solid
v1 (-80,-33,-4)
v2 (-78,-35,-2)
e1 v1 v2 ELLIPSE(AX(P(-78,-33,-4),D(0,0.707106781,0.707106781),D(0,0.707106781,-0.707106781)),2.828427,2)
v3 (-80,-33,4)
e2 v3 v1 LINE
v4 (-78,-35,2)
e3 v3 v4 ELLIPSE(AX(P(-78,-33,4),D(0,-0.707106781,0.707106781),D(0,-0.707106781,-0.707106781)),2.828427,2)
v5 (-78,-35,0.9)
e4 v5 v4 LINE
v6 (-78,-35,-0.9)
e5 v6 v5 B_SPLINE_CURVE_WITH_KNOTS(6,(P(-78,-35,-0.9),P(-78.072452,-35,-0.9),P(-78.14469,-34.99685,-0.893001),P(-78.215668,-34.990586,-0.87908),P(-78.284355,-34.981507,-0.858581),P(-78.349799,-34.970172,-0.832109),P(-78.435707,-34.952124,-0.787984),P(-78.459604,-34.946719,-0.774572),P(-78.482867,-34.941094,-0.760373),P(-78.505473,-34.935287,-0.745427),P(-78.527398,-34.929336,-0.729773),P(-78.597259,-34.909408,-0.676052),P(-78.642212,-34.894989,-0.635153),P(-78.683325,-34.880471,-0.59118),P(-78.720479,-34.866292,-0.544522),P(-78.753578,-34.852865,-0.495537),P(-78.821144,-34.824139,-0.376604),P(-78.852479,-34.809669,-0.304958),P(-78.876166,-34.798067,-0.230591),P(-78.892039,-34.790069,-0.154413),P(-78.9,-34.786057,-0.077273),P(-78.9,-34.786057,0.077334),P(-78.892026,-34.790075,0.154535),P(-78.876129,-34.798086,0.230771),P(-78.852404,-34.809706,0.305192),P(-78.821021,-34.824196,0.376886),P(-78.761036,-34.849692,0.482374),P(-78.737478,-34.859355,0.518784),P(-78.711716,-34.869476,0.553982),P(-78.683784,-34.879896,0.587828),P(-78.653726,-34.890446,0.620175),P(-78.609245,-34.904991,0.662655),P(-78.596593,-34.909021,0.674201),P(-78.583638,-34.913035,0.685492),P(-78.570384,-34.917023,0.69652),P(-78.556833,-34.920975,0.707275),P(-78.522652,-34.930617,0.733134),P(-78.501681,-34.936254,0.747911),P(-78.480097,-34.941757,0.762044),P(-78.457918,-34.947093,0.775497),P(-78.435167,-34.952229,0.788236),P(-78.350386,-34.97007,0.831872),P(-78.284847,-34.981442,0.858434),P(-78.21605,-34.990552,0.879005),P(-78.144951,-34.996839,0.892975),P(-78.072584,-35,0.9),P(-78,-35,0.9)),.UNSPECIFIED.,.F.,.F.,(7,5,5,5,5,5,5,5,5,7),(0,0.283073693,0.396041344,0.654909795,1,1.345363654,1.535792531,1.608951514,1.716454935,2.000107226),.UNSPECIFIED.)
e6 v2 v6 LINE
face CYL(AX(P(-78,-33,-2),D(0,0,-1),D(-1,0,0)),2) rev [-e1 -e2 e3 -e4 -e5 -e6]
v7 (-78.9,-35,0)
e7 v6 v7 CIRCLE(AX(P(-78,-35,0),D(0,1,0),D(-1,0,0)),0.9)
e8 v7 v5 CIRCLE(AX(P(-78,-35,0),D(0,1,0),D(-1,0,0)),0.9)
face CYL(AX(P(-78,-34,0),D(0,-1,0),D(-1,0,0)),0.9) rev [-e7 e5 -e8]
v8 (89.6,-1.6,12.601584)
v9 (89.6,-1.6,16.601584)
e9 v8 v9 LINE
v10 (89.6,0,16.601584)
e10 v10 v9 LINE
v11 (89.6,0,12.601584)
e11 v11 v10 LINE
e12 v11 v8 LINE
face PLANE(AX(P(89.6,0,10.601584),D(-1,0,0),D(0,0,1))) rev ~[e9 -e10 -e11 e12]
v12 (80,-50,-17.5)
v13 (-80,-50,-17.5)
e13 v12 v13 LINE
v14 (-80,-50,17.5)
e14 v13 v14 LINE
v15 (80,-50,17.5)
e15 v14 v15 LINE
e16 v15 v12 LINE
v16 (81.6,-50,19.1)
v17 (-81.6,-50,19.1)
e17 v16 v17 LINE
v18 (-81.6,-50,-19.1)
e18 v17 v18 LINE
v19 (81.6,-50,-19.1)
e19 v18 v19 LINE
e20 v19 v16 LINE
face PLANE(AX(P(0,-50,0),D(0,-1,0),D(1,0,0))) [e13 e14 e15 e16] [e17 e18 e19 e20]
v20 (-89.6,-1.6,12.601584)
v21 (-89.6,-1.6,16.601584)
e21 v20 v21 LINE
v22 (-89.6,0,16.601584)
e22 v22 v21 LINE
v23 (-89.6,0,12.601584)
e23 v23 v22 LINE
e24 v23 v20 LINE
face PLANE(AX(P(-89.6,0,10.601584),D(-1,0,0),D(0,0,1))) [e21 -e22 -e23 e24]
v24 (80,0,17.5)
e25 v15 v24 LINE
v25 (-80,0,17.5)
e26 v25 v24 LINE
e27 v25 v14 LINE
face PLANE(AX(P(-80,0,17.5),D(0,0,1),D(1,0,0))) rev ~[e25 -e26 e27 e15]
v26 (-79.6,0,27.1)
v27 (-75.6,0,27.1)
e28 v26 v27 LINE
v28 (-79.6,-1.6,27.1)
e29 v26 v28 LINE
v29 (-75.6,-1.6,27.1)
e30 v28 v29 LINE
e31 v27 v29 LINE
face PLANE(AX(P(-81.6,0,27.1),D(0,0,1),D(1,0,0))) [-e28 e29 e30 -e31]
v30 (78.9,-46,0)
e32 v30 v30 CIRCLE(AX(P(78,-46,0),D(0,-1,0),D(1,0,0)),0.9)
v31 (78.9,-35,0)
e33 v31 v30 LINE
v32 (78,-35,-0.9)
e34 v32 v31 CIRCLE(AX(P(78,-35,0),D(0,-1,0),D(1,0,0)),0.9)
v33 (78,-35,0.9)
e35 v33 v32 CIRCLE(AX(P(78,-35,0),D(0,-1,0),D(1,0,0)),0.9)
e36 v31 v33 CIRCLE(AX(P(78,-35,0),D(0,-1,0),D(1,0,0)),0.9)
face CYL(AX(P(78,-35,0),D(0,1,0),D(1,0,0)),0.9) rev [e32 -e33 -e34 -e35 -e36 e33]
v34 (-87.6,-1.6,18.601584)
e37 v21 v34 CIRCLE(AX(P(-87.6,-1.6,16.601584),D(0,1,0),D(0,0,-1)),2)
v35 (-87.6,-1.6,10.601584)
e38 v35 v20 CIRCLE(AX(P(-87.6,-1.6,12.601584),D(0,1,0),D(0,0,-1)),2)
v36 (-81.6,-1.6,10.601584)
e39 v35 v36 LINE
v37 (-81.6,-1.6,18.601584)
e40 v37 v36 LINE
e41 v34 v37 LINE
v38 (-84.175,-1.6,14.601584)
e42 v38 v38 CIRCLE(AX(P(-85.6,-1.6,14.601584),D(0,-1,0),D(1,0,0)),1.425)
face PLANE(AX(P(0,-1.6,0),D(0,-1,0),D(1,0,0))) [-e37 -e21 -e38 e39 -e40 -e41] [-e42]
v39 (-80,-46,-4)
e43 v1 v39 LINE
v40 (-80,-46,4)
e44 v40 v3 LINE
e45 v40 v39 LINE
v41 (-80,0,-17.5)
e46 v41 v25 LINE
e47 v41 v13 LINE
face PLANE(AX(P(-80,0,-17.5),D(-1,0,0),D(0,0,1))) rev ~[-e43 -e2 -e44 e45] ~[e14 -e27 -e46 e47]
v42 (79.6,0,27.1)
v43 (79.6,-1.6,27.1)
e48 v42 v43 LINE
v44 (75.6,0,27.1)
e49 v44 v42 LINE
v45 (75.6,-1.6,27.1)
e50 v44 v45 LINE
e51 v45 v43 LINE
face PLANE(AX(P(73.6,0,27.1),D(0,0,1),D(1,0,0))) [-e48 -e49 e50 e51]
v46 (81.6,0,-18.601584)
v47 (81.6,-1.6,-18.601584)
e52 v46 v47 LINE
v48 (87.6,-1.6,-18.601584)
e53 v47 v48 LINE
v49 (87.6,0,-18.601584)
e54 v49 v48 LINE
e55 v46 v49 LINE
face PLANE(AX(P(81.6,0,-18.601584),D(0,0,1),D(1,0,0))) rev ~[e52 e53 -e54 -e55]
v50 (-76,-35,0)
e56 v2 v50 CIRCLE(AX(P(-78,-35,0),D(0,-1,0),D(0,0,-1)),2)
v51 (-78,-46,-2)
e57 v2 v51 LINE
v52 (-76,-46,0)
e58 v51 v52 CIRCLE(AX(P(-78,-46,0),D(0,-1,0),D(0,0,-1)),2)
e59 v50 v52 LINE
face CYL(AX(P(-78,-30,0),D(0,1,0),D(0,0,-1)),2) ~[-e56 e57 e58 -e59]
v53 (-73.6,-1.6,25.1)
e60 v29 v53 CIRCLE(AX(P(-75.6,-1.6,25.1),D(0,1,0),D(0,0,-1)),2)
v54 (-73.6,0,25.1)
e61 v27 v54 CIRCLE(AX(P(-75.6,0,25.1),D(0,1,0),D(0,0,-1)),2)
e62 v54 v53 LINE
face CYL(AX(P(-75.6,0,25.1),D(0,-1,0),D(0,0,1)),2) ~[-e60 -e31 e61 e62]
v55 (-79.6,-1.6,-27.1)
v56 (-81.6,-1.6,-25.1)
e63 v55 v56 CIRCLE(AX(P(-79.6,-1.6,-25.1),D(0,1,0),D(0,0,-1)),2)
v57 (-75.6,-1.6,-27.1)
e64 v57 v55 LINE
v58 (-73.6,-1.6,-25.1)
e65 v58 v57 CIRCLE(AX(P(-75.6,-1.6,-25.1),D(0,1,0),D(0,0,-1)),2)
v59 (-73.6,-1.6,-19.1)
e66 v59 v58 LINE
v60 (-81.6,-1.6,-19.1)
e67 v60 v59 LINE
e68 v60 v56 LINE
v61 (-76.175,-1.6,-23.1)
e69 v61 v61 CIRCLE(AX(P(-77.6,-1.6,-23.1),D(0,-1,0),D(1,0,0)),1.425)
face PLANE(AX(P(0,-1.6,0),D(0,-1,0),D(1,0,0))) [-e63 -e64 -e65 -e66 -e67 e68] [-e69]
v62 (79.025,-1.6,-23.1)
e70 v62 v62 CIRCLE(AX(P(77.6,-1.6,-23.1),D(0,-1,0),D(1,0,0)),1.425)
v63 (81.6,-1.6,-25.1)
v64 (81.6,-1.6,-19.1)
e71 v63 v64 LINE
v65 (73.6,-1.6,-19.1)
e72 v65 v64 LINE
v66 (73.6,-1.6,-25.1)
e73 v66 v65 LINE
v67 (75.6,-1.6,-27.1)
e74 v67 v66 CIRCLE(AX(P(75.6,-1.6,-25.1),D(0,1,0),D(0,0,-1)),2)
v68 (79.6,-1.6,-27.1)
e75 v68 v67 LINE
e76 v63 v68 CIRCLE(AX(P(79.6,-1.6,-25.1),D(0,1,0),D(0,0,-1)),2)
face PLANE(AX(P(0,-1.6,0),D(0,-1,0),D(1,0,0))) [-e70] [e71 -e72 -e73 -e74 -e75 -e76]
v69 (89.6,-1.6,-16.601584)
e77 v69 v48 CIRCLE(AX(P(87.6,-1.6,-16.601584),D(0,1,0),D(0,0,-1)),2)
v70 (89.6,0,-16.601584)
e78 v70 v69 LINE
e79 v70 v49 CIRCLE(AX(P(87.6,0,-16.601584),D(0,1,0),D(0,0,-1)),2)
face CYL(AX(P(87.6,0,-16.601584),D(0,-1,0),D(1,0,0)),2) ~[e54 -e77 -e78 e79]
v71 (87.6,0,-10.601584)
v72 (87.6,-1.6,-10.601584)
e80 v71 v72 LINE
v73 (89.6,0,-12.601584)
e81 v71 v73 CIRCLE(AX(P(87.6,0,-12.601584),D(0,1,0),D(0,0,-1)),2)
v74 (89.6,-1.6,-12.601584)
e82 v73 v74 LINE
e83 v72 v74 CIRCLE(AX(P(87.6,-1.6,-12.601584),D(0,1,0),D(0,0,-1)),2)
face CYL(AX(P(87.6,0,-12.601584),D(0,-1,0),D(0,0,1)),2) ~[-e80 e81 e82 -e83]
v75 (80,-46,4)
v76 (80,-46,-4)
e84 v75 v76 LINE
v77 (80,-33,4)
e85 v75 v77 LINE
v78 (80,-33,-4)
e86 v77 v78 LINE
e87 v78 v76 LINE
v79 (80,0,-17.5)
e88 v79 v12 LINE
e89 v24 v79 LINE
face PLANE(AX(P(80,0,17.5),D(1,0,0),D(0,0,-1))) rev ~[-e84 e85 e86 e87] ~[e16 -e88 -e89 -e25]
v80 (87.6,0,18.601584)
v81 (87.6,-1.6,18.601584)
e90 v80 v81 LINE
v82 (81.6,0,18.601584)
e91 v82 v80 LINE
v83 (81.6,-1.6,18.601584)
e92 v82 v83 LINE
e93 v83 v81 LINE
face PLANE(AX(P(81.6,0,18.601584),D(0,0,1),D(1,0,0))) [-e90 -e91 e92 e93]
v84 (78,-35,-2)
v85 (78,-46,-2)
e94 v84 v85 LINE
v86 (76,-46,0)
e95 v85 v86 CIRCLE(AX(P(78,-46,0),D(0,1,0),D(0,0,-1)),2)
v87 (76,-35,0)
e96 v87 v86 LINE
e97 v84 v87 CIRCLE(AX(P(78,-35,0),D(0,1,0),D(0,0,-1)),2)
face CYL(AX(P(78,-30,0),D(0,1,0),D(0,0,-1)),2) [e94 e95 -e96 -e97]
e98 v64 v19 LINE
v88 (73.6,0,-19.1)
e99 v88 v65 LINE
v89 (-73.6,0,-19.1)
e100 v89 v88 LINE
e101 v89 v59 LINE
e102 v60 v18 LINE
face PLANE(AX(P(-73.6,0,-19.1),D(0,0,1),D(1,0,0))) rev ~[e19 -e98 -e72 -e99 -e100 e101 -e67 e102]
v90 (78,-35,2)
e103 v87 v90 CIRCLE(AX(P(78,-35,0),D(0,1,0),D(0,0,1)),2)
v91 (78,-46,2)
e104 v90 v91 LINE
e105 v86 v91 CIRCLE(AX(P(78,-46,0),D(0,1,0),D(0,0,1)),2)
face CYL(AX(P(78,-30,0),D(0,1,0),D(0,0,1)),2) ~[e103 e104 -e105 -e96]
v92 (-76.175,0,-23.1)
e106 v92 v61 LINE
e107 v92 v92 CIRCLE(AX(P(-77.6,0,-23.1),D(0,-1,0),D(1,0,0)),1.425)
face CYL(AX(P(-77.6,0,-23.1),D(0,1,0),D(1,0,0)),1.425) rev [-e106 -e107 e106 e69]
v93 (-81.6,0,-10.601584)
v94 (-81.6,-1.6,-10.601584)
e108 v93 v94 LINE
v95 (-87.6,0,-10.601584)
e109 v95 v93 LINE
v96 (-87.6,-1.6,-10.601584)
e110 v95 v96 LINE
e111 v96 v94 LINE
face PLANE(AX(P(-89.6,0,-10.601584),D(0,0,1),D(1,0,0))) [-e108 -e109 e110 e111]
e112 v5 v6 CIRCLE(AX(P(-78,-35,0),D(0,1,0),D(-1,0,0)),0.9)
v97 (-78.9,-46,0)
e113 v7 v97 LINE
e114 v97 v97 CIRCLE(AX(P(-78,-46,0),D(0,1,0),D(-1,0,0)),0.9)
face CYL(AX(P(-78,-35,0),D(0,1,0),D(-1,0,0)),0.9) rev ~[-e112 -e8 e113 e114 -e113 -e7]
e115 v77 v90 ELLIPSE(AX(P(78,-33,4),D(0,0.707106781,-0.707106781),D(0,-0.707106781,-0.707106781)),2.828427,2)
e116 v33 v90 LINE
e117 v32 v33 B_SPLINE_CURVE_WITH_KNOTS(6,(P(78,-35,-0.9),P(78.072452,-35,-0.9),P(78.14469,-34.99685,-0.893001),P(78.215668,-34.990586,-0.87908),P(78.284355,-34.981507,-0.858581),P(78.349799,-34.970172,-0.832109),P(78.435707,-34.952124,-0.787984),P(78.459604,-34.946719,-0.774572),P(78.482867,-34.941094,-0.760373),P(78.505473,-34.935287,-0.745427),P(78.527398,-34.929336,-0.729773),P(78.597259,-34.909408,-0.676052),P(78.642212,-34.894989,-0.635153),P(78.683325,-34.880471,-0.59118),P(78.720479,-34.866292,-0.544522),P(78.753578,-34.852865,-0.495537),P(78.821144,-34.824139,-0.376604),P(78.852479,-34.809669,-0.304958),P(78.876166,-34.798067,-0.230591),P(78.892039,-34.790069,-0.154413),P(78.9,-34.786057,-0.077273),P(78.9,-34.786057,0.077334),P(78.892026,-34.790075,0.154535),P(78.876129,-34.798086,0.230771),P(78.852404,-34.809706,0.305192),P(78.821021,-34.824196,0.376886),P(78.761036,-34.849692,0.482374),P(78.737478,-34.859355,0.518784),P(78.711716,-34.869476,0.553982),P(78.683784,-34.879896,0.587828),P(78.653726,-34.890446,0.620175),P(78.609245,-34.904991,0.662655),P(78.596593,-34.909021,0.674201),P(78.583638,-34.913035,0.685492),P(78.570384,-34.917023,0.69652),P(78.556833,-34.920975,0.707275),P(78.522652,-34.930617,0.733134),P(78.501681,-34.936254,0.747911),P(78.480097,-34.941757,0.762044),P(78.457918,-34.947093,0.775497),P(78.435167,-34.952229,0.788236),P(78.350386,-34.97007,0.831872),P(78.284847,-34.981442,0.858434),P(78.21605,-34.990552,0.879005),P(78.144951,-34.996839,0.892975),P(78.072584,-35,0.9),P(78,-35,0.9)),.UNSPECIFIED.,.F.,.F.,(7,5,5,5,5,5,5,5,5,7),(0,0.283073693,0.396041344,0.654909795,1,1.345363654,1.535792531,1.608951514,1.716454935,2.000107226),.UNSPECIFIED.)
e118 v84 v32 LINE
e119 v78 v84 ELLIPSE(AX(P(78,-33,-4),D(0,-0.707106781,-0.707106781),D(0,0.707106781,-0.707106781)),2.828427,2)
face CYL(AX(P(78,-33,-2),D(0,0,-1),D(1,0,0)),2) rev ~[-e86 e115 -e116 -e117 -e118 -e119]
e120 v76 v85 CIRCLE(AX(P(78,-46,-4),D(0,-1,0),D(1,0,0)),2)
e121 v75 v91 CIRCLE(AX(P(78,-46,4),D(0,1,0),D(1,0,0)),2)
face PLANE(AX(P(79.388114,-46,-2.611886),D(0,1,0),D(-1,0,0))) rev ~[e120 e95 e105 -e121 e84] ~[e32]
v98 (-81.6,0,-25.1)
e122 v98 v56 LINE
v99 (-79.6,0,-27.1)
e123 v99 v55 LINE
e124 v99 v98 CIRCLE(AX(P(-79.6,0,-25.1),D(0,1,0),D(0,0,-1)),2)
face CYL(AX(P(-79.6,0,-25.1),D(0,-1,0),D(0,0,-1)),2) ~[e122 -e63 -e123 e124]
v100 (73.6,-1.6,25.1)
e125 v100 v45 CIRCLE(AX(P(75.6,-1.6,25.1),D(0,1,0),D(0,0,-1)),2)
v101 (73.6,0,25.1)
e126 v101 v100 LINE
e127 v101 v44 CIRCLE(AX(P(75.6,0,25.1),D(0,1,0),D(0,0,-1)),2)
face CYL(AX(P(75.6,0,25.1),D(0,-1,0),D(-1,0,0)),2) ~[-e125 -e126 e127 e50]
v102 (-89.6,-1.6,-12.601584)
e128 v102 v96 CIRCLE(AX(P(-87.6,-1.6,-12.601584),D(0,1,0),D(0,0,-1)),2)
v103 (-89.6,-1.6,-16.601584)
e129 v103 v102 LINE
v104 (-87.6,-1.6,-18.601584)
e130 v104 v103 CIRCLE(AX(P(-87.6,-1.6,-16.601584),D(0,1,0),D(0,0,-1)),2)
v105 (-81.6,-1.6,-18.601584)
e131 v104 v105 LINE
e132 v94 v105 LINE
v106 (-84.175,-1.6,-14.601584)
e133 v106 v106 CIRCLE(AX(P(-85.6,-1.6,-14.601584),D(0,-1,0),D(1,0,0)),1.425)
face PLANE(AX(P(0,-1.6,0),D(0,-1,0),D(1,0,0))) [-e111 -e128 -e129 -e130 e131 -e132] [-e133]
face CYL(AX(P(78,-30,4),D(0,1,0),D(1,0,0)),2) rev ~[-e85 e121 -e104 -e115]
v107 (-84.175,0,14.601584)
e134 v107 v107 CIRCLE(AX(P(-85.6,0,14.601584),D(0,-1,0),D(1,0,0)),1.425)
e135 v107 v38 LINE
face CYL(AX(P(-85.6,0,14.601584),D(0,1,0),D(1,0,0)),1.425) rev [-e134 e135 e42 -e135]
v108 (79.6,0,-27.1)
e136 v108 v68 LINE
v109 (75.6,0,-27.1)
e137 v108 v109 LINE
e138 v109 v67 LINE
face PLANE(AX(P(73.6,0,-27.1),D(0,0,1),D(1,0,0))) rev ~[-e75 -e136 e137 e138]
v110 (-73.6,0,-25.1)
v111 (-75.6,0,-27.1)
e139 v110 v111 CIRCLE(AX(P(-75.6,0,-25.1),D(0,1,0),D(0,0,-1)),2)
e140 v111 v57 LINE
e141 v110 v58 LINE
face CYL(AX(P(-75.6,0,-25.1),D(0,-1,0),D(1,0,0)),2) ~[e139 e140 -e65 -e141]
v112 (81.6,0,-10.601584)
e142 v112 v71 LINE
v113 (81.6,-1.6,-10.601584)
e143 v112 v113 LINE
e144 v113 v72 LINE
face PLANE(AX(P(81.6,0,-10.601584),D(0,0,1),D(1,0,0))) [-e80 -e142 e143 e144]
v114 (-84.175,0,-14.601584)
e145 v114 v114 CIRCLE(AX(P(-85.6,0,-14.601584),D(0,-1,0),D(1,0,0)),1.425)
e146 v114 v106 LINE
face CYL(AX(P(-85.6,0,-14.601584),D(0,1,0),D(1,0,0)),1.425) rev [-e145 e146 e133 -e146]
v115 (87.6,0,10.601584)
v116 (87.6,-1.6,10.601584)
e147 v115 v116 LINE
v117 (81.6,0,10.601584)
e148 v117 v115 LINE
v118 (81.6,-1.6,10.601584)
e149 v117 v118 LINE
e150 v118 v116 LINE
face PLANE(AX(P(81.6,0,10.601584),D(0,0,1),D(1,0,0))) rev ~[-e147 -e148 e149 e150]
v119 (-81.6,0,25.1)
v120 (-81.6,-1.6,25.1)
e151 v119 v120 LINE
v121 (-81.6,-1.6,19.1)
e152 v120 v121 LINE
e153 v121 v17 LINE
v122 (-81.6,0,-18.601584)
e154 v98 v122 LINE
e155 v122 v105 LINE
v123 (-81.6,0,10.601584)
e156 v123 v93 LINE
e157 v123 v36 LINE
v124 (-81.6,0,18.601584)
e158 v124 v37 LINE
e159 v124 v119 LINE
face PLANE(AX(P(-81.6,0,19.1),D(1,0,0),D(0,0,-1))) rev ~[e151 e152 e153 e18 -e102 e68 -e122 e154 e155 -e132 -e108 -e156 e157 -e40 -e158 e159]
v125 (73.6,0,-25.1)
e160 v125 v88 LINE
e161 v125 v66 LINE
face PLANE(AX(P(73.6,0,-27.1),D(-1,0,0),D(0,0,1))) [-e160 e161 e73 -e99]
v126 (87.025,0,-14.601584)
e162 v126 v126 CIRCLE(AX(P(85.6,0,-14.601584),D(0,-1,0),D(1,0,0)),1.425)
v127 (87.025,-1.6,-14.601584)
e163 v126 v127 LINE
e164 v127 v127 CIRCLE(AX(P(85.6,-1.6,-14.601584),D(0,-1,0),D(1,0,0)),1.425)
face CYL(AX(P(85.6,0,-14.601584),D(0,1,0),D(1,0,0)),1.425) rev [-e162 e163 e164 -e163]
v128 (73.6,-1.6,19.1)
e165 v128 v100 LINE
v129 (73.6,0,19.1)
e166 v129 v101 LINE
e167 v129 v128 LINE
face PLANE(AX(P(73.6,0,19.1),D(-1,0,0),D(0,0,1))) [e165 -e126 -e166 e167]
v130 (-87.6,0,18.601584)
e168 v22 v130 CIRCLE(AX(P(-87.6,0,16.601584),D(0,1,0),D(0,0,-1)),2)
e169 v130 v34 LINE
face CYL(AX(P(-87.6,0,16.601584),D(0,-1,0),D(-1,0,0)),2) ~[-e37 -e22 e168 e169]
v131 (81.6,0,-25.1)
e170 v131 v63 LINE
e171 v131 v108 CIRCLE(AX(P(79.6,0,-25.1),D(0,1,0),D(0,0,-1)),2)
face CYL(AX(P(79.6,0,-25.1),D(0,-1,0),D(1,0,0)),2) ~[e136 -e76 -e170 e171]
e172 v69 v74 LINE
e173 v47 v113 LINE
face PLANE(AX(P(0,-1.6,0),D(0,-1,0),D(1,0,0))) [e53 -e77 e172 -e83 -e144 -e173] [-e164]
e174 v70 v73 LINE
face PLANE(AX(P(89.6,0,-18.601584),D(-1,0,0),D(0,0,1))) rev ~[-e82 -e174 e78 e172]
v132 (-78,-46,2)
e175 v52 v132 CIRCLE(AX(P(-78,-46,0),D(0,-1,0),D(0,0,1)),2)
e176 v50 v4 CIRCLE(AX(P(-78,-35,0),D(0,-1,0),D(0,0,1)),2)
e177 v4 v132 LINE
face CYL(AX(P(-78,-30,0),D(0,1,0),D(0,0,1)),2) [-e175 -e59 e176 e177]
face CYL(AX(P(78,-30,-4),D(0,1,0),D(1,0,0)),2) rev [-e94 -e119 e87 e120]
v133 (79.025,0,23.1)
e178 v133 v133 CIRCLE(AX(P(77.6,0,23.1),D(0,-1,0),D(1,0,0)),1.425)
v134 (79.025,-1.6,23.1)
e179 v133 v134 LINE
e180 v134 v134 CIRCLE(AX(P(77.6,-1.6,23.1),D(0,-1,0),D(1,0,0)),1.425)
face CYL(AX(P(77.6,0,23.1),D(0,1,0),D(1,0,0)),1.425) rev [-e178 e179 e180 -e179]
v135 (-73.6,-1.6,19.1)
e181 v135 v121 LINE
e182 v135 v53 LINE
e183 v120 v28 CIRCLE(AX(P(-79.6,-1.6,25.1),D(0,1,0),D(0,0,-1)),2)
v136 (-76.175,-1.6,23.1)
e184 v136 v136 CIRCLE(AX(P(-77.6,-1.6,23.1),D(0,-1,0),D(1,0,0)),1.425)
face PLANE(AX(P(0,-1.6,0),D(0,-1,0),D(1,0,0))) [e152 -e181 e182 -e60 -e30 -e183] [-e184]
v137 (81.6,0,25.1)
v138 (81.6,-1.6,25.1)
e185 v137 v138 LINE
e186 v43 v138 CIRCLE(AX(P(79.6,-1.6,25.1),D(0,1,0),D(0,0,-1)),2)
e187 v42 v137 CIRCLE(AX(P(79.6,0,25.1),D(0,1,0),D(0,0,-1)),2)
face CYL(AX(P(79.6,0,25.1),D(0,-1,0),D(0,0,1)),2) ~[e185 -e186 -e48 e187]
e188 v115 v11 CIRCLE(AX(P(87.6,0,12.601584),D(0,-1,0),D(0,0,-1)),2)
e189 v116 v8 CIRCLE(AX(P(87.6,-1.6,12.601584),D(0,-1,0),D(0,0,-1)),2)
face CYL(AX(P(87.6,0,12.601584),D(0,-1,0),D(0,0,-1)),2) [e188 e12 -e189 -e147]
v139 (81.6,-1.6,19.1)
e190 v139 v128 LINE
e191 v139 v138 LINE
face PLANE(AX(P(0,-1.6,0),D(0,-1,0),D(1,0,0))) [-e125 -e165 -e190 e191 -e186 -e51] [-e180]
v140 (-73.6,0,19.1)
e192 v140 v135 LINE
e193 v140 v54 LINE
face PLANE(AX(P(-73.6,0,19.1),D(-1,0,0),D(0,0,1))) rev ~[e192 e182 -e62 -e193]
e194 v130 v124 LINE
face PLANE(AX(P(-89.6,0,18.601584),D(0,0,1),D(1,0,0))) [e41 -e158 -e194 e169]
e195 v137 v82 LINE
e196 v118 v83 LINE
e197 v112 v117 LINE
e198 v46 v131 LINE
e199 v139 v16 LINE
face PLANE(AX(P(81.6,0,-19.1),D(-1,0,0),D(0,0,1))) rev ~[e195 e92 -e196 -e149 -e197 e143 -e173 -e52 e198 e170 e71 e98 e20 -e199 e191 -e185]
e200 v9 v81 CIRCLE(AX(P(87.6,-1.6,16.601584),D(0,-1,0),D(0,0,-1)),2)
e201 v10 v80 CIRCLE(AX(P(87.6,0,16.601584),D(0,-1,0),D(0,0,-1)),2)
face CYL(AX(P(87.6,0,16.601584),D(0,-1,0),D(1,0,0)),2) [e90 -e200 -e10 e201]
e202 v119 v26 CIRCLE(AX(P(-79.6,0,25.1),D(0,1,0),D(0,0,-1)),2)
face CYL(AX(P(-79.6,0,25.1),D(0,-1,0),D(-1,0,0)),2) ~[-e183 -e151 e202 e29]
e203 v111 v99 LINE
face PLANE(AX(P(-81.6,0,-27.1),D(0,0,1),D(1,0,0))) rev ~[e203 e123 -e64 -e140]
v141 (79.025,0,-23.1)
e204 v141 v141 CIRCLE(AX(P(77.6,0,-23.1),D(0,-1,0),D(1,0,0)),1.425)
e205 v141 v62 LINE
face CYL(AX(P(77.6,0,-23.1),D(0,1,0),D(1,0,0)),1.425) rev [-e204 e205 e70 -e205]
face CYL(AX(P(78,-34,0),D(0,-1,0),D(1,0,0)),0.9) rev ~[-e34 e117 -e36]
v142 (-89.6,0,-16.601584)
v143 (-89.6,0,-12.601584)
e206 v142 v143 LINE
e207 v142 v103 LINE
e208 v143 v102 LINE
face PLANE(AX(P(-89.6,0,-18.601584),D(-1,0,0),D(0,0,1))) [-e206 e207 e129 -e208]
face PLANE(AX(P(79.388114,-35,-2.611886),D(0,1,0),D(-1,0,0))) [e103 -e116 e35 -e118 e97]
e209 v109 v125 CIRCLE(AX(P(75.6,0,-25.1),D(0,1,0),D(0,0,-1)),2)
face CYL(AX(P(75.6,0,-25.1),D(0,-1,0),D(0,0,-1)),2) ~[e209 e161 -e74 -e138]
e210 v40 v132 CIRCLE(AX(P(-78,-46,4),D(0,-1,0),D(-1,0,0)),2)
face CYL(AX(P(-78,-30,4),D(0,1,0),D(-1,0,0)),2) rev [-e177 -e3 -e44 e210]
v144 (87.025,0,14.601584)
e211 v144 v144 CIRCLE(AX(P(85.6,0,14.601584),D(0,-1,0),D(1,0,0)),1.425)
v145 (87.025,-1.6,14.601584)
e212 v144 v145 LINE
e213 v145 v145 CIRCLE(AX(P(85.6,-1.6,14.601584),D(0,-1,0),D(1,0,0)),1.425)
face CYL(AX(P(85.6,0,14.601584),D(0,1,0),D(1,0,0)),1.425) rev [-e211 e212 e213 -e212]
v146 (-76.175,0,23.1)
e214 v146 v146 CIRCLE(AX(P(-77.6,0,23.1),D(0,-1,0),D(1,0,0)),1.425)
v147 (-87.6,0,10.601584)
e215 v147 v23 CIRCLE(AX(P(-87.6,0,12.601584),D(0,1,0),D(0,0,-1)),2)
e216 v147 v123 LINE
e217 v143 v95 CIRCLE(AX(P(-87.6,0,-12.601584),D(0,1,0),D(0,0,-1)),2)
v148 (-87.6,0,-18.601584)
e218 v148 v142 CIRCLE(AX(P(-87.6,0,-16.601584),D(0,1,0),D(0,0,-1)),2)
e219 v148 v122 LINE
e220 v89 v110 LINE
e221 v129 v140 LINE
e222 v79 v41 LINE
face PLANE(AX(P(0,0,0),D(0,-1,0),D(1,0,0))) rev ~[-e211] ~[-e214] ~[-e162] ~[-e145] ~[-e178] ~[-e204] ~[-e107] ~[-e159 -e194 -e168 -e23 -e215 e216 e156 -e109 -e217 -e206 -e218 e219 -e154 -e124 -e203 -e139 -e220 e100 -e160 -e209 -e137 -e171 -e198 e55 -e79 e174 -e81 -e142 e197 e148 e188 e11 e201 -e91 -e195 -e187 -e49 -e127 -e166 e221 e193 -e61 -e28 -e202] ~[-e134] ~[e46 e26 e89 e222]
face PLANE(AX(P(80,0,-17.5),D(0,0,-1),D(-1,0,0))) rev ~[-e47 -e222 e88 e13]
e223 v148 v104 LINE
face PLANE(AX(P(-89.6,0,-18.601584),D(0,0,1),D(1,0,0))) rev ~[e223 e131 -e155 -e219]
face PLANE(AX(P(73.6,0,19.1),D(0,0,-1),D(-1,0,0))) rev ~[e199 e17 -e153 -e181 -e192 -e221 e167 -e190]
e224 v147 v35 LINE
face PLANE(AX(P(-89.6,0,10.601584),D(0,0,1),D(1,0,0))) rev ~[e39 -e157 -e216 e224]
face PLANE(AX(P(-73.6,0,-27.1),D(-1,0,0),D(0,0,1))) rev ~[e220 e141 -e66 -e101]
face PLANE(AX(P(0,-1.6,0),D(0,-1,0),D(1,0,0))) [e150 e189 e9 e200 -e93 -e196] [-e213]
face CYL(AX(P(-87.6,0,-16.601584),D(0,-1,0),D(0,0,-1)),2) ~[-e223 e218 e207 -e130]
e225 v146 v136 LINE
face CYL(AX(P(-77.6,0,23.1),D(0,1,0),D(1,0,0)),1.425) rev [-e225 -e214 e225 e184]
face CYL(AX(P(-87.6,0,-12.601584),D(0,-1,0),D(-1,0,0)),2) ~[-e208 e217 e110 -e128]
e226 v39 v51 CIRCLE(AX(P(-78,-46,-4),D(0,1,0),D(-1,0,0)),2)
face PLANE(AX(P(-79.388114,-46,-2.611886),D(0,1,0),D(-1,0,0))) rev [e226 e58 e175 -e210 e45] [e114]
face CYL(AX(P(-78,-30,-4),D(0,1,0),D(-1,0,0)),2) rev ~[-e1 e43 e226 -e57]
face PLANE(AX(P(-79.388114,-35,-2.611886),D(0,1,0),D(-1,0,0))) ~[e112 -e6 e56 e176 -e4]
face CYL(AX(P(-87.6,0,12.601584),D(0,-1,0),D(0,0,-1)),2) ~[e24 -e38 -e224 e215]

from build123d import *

# Parameters (mm, degrees)
F1_DEPTH     = 50
F0_W         = 8
F0_H         = 8
F0_R         = 1.425
F2_DEPTH     = 1.6
F3_R         = 2
F5_R         = 2
F6_START     = 35
F0_W_2       = 4
F0_H_2       = 4
F0_R_2       = 0.9
F6_DEPTH     = 11
F7_T1_DEPTH  = 11
F7_T6_DEPTH  = 4
F7_S7_R      = 0.9
F7_T8_DEPTH  = 4
F7_T13_DEPTH = 9
F7_T17_DEPTH = 16
F7_T24_DEPTH = 9
F7_T28_DEPTH = 16
F7_T31_DEPTH = 21
F9_R         = 2


# Not quite as in the source:
# - a fillet or chamfer that OpenCascade refuses, or shapes differently, is made with other operations: its cross-section is extruded or revolved along the edge and cut away or added


with BuildPart() as f1:
    # F0 (on Front) → F1 (new body)
    with BuildSketch(Plane.XZ):
        Polygon((-81.6, -18.6015841149), (-81.6, -19.1), (-73.6, -19.1), (73.6, -19.1), (81.6, -19.1), (81.6, -18.6015841149), (81.6, -10.6015841149), (81.6, 10.6015841149), (81.6, 18.6015841149), (81.6, 19.1), (73.6, 19.1), (-73.6, 19.1), (-81.6, 19.1), (-81.6, 18.6015841149), (-81.6, 10.6015841149), (-81.6, -10.6015841149), align=None)
        Polygon((80, -2), (80, -17.5), (-80, -17.5), (-80, 17.5), (80, 17.5), (80, 2), align=None, mode=Mode.SUBTRACT)
    extrude(amount=F1_DEPTH)

    # F0 (on Front) → F2 (join)
    with BuildSketch(Plane.XZ):
        Polygon((-81.6, -18.6015841149), (-81.6, -19.1), (-73.6, -19.1), (73.6, -19.1), (81.6, -19.1), (81.6, -18.6015841149), (81.6, -10.6015841149), (81.6, 10.6015841149), (81.6, 18.6015841149), (81.6, 19.1), (73.6, 19.1), (-73.6, 19.1), (-81.6, 19.1), (-81.6, 18.6015841149), (-81.6, 10.6015841149), (-81.6, -10.6015841149), align=None)
        Polygon((80, -2), (80, -17.5), (-80, -17.5), (-80, 17.5), (80, 17.5), (80, 2), align=None, mode=Mode.SUBTRACT)
        with Locations((-77.6, -23.1)):
            Rectangle(F0_W, F0_H)
        with Locations((-77.6, -23.1)):
            Circle(F0_R, mode=Mode.SUBTRACT)
        with Locations((-85.6, -14.6015841149)):
            Rectangle(F0_W, F0_H)
        with Locations((-85.6, -14.6015841149)):
            Circle(F0_R, mode=Mode.SUBTRACT)
        with Locations((77.6, -23.1)):
            Rectangle(F0_W, F0_H)
        with Locations((77.6, -23.1)):
            Circle(F0_R, mode=Mode.SUBTRACT)
        with Locations((-85.6, 14.6015841149)):
            Rectangle(F0_W, F0_H)
        with Locations((-85.6, 14.6015841149)):
            Circle(F0_R, mode=Mode.SUBTRACT)
        with Locations((85.6, -14.6015841149)):
            Rectangle(F0_W, F0_H)
        with Locations((85.6, -14.6015841149)):
            Circle(F0_R, mode=Mode.SUBTRACT)
        with Locations((-77.6, 23.1)):
            Rectangle(F0_W, F0_H)
        with Locations((-77.6, 23.1)):
            Circle(F0_R, mode=Mode.SUBTRACT)
        with Locations((85.6, 14.6015841149)):
            Rectangle(F0_W, F0_H)
        with Locations((85.6, 14.6015841149)):
            Circle(F0_R, mode=Mode.SUBTRACT)
        with Locations((77.6, 23.1)):
            Rectangle(F0_W, F0_H)
        with Locations((77.6, 23.1)):
            Circle(F0_R, mode=Mode.SUBTRACT)
    extrude(amount=F2_DEPTH)

    # F3
    f3_edges = [f1.edges().sort_by_distance(p)[0] for p in [
        (-81.6, -0.8, 27.1),
        (-73.6, -0.8, 27.1),
        (73.6, -0.8, 27.1),
        (81.6, -0.8, 27.1),
        (89.6, -0.8, -10.601584),
        (89.6, -0.8, -18.601584),
        (81.6, -0.8, -27.1),
        (73.6, -0.8, -27.1),
        (-89.6, -0.8, -18.601584),
        (-89.6, -0.8, -10.601584),
        (-81.6, -0.8, -27.1),
    ]]
    fillet(f3_edges, radius=F3_R)

    # F4: F1 across plane


with BuildPart() as f1_1:
    add(f1.part)
    add(f1.part.mirror(Plane.YZ))

    # F5
    f5_edges = [f1_1.edges().sort_by_distance(p)[0] for p in [
        (-73.6, -0.8, -27.1),
        (73.6, -0.8, -27.1),
    ]]
    fillet(f5_edges, radius=F5_R)

    # F0 (on Front) → F6 (join)
    with BuildSketch(Plane.XZ.offset(F6_START)):
        with Locations((78, 0)):
            Rectangle(F0_W_2, F0_H_2)
        with Locations((78, 0)):
            Circle(F0_R_2, mode=Mode.SUBTRACT)
    extrude(amount=F6_DEPTH)

    # F7: fillet of radius 2 on 5 edges, made by hand

    # F7_s2 → F7_t1 (join)
    with BuildSketch(Plane.XZ.offset(35)):
        with BuildLine():
            ThreePointArc((80, -4), (79.4142135624, -2.5857864376), (78, -2))
            Line((78, -2), (80, -2))
            Line((80, -2), (80, -4))
        make_face()
        with BuildLine():
            ThreePointArc((80, 4), (79.4142135624, 2.5857864376), (78, 2))
            Line((78, 2), (80, 2))
            Line((80, 2), (80, 4))
        make_face()
    extrude(amount=F7_T1_DEPTH)


with BuildPart() as f7_tool4:
    # F7_s5 → F7_t6 (new body)
    with BuildSketch(Plane.XY.offset(-2)):
        with BuildLine():
            ThreePointArc((80, -33), (79.4142135624, -34.4142135624), (78, -35))
            Line((78, -35), (80, -35))
            Line((80, -35), (80, -33))
        make_face()
    extrude(amount=F7_T6_DEPTH)

    # F7_s7 → F7_t8 (cut, symmetric)
    with BuildSketch(Plane.XZ.offset(34)):
        with Locations((78, 0)):
            Circle(F7_S7_R)
    extrude(amount=F7_T8_DEPTH, both=True, mode=Mode.SUBTRACT)


with BuildPart() as f1_2:
    add(f1_1.part)

    # F7_t3: union F7_tool4
    add(f7_tool4.part)


with BuildPart() as f7_tool11:
    # F7_s12 → F7_t13 (new body)
    with BuildSketch(Plane.XY.offset(-7)):
        with BuildLine():
            ThreePointArc((80, -33), (79.4142135624, -34.4142135624), (78, -35))
            Line((78, -35), (80, -35))
            Line((80, -35), (80, -33))
        make_face()
    extrude(amount=F7_T13_DEPTH)

    split(bisect_by=Plane.XY.offset(-2), keep=Keep.BOTTOM)


with BuildPart() as f7_tool15:
    # F7_s16 → F7_t17 (new body)
    with BuildSketch(Plane.XZ.offset(30)):
        with BuildLine():
            ThreePointArc((80, -4), (79.4142135624, -2.5857864376), (78, -2))
            Line((78, -2), (80, -2))
            Line((80, -2), (80, -4))
        make_face()
    extrude(amount=F7_T17_DEPTH)

    split(bisect_by=Plane.XZ.offset(35), keep=Keep.BOTTOM)


with BuildPart() as f7_tool11_1:
    add(f7_tool11.part)

    # F7_t19: intersect F7_tool15
    add(f7_tool15.part, mode=Mode.INTERSECT)


with BuildPart() as f1_3:
    add(f1_2.part)

    # F7_t9: union F7_tool11
    add(f7_tool11_1.part)


with BuildPart() as f7_tool22:
    # F7_s23 → F7_t24 (new body)
    with BuildSketch(Plane.XY.offset(-2)):
        with BuildLine():
            ThreePointArc((80, -33), (79.4142135624, -34.4142135624), (78, -35))
            Line((78, -35), (80, -35))
            Line((80, -35), (80, -33))
        make_face()
    extrude(amount=F7_T24_DEPTH)

    split(bisect_by=Plane.XY.offset(2), keep=Keep.TOP)


with BuildPart() as f7_tool26:
    # F7_s27 → F7_t28 (new body)
    with BuildSketch(Plane.XZ.offset(30)):
        with BuildLine():
            ThreePointArc((80, 4), (79.4142135624, 2.5857864376), (78, 2))
            Line((78, 2), (80, 2))
            Line((80, 2), (80, 4))
        make_face()
    extrude(amount=F7_T28_DEPTH)

    split(bisect_by=Plane.XZ.offset(35), keep=Keep.BOTTOM)


with BuildPart() as f7_tool22_1:
    add(f7_tool22.part)

    # F7_t30: intersect F7_tool26
    add(f7_tool26.part, mode=Mode.INTERSECT)


with BuildPart() as f1_4:
    add(f1_3.part)

    # F7_t20: union F7_tool22
    add(f7_tool22_1.part)

    # F7_s32 → F7_t31 (cut)
    with BuildSketch(Plane.XZ.offset(30)):
        with BuildLine():
            ThreePointArc((78, -2), (76.5857864376, -1.4142135624), (76, 0))
            Line((76, 0), (76, -2))
            Line((76, -2), (78, -2))
        make_face()
        with BuildLine():
            ThreePointArc((78, 2), (76.5857864376, 1.4142135624), (76, 0))
            Line((76, 0), (76, 2))
            Line((76, 2), (78, 2))
        make_face()
    extrude(amount=F7_T31_DEPTH, mode=Mode.SUBTRACT)

    # F8: F1 across plane


with BuildPart() as f1_5:
    add(f1_4.part)
    add(f1_4.part.mirror(Plane.YZ))

    # F9
    f9_edges = [f1_5.edges().sort_by_distance(p)[0] for p in [
        (89.6, -0.8, 10.601584),
        (89.6, -0.8, 18.601584),
        (-89.6, -0.8, 10.601584),
        (-89.6, -0.8, 18.601584),
    ]]
    fillet(f9_edges, radius=F9_R)


solid = f1_5.part
